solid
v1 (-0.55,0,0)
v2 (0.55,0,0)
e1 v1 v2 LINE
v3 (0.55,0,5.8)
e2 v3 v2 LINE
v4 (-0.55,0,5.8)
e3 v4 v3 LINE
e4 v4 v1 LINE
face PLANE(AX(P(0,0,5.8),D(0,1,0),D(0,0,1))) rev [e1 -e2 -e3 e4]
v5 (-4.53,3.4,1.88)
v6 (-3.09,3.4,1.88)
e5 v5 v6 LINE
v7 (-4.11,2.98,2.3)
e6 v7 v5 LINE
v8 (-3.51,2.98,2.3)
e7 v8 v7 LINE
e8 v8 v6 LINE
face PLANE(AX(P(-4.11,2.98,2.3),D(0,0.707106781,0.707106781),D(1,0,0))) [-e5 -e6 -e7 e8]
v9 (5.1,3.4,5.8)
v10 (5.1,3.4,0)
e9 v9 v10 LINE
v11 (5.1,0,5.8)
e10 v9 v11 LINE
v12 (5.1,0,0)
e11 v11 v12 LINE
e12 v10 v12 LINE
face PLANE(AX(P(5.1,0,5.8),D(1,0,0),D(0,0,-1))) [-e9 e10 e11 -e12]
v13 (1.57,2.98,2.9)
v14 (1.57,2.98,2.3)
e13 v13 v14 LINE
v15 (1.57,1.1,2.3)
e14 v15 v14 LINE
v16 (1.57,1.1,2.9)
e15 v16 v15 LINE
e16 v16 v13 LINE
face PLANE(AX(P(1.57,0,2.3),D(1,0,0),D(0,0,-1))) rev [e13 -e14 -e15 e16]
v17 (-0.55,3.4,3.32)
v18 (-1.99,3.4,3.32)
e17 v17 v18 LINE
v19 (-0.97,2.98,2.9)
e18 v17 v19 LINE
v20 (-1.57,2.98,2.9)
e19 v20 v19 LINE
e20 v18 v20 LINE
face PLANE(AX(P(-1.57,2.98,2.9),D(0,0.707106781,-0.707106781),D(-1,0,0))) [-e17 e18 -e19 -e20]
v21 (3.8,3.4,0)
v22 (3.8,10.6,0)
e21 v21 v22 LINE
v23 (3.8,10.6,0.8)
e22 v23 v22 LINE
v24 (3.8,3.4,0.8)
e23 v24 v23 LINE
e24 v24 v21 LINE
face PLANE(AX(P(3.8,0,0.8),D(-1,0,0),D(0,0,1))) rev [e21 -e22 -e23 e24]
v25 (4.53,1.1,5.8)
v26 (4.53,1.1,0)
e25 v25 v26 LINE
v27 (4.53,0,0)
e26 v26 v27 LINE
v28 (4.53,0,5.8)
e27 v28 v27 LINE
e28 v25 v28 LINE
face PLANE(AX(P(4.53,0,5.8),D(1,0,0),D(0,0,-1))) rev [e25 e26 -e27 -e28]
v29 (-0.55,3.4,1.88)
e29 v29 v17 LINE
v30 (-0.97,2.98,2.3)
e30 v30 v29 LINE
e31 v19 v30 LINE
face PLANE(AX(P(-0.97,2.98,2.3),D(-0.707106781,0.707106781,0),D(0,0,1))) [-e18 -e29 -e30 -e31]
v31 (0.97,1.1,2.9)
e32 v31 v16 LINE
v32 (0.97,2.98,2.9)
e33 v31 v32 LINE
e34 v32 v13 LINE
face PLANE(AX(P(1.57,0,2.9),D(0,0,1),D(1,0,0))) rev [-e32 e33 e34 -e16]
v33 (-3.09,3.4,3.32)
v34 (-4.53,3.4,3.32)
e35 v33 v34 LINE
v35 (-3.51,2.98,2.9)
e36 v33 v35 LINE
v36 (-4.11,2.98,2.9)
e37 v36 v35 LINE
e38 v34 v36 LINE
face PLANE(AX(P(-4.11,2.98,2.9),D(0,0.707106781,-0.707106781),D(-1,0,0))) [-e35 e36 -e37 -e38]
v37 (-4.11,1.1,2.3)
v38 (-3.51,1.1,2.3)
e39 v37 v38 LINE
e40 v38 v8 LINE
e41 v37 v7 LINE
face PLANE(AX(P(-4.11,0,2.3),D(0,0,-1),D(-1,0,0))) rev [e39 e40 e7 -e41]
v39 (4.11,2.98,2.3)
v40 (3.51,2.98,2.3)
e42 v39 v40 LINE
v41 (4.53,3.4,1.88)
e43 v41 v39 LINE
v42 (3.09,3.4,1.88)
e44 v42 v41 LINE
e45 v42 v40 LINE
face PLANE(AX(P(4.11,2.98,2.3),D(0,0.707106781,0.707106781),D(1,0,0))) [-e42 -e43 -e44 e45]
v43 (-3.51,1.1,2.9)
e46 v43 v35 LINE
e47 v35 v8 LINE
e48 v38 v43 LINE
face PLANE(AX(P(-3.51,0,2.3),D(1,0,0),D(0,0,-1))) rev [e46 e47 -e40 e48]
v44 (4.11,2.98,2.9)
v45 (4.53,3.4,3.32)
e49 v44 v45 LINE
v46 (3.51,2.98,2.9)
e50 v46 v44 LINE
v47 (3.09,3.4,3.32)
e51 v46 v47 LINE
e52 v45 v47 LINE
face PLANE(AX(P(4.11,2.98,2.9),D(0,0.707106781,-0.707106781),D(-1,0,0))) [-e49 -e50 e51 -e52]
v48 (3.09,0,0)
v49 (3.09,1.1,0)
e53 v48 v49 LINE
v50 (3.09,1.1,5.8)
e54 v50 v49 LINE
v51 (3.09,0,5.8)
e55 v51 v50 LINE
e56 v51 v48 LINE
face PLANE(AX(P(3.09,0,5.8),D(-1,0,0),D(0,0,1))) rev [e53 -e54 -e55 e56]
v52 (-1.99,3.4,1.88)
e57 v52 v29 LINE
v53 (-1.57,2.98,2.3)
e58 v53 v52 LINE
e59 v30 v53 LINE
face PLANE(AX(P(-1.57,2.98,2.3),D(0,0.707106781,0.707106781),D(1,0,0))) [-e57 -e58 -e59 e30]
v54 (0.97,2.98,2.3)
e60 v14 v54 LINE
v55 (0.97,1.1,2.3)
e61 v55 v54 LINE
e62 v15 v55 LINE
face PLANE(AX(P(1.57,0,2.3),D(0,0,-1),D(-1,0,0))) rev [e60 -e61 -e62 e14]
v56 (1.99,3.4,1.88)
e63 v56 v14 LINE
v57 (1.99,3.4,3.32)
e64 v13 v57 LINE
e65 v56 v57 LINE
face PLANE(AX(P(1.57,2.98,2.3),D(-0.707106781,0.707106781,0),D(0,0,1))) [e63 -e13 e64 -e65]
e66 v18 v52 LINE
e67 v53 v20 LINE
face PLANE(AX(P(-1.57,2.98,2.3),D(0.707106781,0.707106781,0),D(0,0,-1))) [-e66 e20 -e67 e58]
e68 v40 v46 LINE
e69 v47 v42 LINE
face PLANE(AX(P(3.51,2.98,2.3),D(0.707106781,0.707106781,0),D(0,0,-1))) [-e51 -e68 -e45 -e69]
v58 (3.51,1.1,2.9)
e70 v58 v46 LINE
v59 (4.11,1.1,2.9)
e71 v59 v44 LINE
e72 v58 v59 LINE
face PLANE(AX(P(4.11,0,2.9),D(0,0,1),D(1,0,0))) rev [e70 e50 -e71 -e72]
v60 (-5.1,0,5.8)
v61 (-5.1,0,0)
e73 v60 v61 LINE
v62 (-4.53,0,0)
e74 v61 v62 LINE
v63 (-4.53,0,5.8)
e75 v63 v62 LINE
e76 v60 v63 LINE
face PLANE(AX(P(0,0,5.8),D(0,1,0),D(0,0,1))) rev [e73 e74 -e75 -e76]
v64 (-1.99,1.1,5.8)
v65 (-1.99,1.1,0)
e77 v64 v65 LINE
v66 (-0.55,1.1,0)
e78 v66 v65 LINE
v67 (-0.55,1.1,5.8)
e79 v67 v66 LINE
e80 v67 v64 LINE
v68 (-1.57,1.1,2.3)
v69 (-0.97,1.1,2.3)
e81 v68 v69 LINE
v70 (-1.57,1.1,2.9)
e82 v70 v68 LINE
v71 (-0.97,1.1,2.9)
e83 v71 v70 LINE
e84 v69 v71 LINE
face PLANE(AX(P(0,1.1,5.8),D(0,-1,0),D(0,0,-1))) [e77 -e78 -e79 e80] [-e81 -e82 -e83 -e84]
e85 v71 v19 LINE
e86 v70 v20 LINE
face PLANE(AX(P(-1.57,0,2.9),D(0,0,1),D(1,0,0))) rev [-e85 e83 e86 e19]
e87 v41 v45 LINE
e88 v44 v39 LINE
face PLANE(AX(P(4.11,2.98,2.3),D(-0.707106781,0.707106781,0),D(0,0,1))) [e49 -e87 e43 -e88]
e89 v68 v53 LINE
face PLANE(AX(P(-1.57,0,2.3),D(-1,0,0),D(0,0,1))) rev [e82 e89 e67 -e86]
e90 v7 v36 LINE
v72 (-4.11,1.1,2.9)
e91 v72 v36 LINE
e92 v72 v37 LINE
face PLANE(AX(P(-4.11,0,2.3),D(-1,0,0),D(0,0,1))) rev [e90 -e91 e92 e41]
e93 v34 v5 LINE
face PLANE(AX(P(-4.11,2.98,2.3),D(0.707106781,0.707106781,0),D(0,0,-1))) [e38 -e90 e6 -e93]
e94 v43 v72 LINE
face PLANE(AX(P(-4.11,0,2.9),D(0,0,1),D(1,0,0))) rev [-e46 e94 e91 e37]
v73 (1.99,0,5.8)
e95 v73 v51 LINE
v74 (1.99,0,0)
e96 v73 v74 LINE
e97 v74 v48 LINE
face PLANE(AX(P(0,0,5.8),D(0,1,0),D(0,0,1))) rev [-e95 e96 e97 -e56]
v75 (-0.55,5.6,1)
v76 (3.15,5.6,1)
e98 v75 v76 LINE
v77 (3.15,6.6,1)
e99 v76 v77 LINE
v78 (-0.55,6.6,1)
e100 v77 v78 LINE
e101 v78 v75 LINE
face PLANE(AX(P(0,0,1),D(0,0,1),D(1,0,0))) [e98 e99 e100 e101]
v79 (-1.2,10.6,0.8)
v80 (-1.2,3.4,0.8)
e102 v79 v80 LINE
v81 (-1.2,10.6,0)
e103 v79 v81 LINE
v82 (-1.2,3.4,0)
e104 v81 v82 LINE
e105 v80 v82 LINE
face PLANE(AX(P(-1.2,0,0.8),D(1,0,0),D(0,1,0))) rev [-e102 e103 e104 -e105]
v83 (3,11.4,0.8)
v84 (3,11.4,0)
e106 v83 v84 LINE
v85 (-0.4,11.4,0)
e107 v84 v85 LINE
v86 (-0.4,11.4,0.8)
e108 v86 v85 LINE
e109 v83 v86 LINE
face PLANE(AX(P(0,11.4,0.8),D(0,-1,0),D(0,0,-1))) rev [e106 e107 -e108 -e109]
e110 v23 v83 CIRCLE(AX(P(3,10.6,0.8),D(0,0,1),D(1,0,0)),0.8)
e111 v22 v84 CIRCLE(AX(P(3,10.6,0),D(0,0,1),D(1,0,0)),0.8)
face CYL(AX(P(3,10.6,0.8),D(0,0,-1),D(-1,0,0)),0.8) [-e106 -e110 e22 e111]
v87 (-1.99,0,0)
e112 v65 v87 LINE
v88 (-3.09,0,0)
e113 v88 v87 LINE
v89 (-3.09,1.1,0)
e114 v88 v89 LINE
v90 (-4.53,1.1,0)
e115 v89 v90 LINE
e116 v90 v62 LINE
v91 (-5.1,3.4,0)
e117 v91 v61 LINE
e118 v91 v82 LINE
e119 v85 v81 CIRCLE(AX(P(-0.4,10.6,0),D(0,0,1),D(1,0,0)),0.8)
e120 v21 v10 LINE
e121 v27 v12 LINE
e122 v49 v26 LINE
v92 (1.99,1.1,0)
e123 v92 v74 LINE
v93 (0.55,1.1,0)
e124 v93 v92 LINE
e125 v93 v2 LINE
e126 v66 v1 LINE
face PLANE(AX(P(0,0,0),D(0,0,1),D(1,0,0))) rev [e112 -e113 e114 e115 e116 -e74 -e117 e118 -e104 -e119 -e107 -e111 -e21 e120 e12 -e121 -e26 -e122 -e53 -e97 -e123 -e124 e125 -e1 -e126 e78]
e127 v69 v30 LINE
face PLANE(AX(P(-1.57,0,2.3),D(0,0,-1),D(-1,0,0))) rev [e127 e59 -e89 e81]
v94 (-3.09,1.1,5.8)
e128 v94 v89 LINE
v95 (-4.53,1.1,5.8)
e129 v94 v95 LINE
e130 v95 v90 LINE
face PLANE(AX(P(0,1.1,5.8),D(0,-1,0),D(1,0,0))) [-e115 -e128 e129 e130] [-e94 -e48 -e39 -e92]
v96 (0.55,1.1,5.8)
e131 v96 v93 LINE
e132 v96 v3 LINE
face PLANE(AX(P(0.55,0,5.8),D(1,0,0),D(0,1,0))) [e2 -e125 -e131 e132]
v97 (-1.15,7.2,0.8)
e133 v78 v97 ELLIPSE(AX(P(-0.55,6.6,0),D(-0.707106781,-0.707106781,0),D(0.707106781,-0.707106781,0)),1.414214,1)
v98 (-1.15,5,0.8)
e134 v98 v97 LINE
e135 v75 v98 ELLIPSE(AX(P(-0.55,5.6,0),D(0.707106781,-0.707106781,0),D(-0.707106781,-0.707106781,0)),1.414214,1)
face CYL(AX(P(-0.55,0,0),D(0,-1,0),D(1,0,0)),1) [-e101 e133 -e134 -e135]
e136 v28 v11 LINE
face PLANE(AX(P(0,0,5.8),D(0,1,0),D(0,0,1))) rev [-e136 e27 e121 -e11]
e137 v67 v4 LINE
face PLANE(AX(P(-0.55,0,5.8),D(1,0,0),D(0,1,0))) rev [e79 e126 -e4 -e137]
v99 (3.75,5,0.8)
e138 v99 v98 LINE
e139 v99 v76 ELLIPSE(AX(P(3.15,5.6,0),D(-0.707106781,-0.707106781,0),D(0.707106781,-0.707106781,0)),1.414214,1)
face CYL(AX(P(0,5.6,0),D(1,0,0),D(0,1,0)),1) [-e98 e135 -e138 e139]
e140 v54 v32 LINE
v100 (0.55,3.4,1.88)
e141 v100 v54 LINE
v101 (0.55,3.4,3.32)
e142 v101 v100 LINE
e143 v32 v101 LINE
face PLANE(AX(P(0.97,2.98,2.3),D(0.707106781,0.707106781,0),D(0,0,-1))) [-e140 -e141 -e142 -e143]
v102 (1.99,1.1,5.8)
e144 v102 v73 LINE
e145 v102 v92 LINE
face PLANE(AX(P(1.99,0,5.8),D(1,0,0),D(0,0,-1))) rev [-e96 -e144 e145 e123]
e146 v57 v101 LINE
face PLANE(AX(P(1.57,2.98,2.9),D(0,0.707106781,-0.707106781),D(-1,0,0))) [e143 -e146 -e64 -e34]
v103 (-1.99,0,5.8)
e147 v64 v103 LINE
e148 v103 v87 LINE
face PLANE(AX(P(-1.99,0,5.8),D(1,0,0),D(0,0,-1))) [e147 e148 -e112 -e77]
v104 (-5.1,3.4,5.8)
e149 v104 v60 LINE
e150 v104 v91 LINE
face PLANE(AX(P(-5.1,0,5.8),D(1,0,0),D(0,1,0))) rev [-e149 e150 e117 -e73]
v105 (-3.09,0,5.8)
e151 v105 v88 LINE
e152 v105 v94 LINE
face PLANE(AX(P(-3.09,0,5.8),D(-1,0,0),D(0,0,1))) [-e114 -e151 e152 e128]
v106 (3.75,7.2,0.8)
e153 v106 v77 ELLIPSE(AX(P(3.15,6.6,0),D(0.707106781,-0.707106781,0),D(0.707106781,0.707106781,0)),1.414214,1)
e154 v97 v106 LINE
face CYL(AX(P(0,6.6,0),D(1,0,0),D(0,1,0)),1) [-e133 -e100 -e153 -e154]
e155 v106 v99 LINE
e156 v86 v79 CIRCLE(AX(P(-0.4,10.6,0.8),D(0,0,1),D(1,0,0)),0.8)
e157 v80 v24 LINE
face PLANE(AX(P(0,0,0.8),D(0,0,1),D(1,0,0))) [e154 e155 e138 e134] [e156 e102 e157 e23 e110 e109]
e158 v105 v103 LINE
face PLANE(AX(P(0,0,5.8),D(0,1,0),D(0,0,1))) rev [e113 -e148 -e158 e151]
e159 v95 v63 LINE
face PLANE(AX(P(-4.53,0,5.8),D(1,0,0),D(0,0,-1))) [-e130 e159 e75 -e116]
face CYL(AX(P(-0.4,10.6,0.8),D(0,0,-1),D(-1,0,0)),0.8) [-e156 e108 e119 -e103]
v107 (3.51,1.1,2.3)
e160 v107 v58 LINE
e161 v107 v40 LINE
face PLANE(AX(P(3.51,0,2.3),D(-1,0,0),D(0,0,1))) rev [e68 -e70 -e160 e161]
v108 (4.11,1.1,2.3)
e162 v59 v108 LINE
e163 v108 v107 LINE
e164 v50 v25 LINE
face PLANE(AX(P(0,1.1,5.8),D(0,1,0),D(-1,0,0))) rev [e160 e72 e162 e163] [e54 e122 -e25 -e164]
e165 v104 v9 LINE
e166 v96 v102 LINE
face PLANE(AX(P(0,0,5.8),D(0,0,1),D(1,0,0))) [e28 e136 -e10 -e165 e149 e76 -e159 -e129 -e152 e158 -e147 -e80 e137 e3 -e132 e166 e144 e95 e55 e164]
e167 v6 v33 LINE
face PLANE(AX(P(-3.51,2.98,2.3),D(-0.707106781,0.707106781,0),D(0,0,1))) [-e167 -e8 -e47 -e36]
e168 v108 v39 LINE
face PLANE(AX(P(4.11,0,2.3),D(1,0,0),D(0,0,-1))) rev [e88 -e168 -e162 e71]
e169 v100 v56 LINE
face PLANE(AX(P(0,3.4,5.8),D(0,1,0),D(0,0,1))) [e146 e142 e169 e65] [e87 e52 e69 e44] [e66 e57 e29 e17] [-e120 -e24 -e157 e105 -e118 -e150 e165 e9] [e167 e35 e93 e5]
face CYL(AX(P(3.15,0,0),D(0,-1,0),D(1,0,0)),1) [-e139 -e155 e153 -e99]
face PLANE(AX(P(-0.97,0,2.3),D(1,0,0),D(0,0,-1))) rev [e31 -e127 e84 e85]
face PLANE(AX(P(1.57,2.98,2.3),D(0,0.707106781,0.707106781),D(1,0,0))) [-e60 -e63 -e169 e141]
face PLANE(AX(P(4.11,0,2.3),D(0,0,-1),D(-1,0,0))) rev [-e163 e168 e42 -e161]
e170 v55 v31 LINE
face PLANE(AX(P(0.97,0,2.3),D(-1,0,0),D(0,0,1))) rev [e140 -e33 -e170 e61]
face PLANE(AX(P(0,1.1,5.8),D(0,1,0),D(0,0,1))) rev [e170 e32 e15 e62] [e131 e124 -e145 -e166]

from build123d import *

# Parameters (mm, degrees)
AUFSATZ_LINEAR_AUSTRAGEN1_DEPTH = 5.8
SKIZZE1_3_W                     = 4.5
SKIZZE1_3_H                     = 1.8
AUFSATZ_LINEAR_AUSTRAGEN2_DEPTH = 0.8
SKIZZE1_4_W                     = 4.5
SKIZZE1_4_H                     = 1.8
AUFSATZ_LINEAR_AUSTRAGEN3_DEPTH = 1
FASE1_SIZE                      = 0.2
VERRUNDUNG1_START               = -2
VERRUNDUNG1_DEPTH               = 7
VERRUNDUNG1_START_2             = 4
VERRUNDUNG1_2_DEPTH             = 4
SKIZZE3_W                       = 0.6
SKIZZE3_H                       = 0.6
SCHNITT_LINEAR_AUSTRAGEN1_DEPTH = 12.119802157
FASE2_SIZE                      = 0.42


with BuildPart() as part:
    # Skizze1 → Aufsatz-Linear austragen1 (new body)
    with BuildSketch(Plane.XY):
        Polygon((-1.99, 1.1), (-0.55, 1.1), (-0.55, 0), (0.55, 0), (0.55, 1.1), (1.99, 1.1), (1.99, 0), (3.09, 0), (3.09, 1.1), (4.53, 1.1), (4.53, 0), (5.1, 0), (5.1, 3.4), (3.8, 3.4), (-1.2, 3.4), (-5.1, 3.4), (-5.1, 0), (-4.53, 0), (-4.53, 1.1), (-3.09, 1.1), (-3.09, 0), (-1.99, 0), align=None)
    extrude(amount=AUFSATZ_LINEAR_AUSTRAGEN1_DEPTH)

    # Skizze1<3> → Aufsatz-Linear austragen2 (add)
    # profile 1 of 2: a face of its own
    with BuildSketch(Plane.XY):
        with BuildLine():
            Line((-1.2, 10.6), (-1.2, 3.4))
            Line((-1.2, 3.4), (3.8, 3.4))
            Line((3.8, 3.4), (3.8, 10.6))
            ThreePointArc((3.8, 10.6), (3.565685425, 11.165685425), (3, 11.4))
            Line((3, 11.4), (-0.4, 11.4))
            ThreePointArc((-0.4, 11.4), (-0.965685425, 11.165685425), (-1.2, 10.6))
        make_face()
        with Locations((1.3, 6.1)):
            Rectangle(SKIZZE1_3_W, SKIZZE1_3_H, mode=Mode.SUBTRACT)
    # profile 2 of 2: a face of its own
    with BuildSketch(Plane.XY):
        with Locations((1.3, 6.1)):
            Rectangle(SKIZZE1_3_W, SKIZZE1_3_H)
    extrude(amount=AUFSATZ_LINEAR_AUSTRAGEN2_DEPTH)

    # Skizze1<4> → Aufsatz-Linear austragen3 (add)
    with BuildSketch(Plane.XY):
        with Locations((1.3, 6.1)):
            Rectangle(SKIZZE1_4_W, SKIZZE1_4_H)
    extrude(amount=AUFSATZ_LINEAR_AUSTRAGEN3_DEPTH)

    # Fase1
    fase1_edges = [part.edges().sort_by_distance(p)[0] for p in [
        (-0.95, 6.1, 0.8),
        (1.3, 5.2, 0.8),
        (3.55, 6.1, 0.8),
        (1.3, 7, 0.8),
    ]]
    chamfer(fase1_edges, length=FASE1_SIZE - 0.0001)  # a hair under: the kernel refuses the full size

    # Verrundung1: read off the stored shape, not the designer's step
    # Verrundung1 outline → Verrundung1 (cut)
    with BuildSketch(Plane.YZ.offset(VERRUNDUNG1_START)):
        with BuildLine():
            ThreePointArc((5, 0.8), (5.283772234, 0.948683298), (5.6, 1))
            Line((5.6, 1), (5.2, 1))
            Line((5.2, 1), (5, 0.8))
        make_face()
        with BuildLine():
            ThreePointArc((6.6, 1), (6.916227766, 0.948683298), (7.2, 0.8))
            Line((7.2, 0.8), (7, 1))
            Line((7, 1), (6.6, 1))
        make_face()
    extrude(amount=VERRUNDUNG1_DEPTH, mode=Mode.SUBTRACT)

    # Verrundung1 2 outline → Verrundung1 2 (cut)
    with BuildSketch(Plane(origin=(0, 0, 0), x_dir=(1, 0, 0), z_dir=(0, 1, 0)).offset(VERRUNDUNG1_START_2)):
        with BuildLine():
            Line((-0.95, -1), (-0.55, -1))
            ThreePointArc((-0.55, -1), (-0.866227766, -0.948683298), (-1.15, -0.8))
            Line((-1.15, -0.8), (-0.95, -1))
        make_face()
        with BuildLine():
            ThreePointArc((3.75, -0.8), (3.466227766, -0.948683298), (3.15, -1))
            Line((3.15, -1), (3.55, -1))
            Line((3.55, -1), (3.75, -0.8))
        make_face()
    extrude(amount=VERRUNDUNG1_2_DEPTH, mode=Mode.SUBTRACT)

    # Skizze3 → Schnitt-Linear austragen1 (cut, through all)
    with BuildSketch(Plane(origin=(0, 3.4, 0), x_dir=(1, 0, 0), z_dir=(0, 1, 0))):
        with Locations((1.27, -2.6)):
            Rectangle(SKIZZE3_W, SKIZZE3_H)
        with Locations((-1.27, -2.6)):
            Rectangle(SKIZZE3_W, SKIZZE3_H)
        with Locations((-3.81, -2.6)):
            Rectangle(SKIZZE3_W, SKIZZE3_H)
        with Locations((3.81, -2.6)):
            Rectangle(SKIZZE3_W, SKIZZE3_H)
    extrude(amount=-SCHNITT_LINEAR_AUSTRAGEN1_DEPTH, mode=Mode.SUBTRACT)

    # Fase2
    fase2_edges = [part.edges().sort_by_distance(p)[0] for p in [
        (3.81, 3.4, 2.3),
        (3.51, 3.4, 2.6),
        (3.81, 3.4, 2.9),
        (4.11, 3.4, 2.6),
        (1.27, 3.4, 2.3),
        (0.97, 3.4, 2.6),
        (1.27, 3.4, 2.9),
        (1.57, 3.4, 2.6),
        (-3.51, 3.4, 2.6),
        (-3.81, 3.4, 2.3),
        (-4.11, 3.4, 2.6),
        (-3.81, 3.4, 2.9),
        (-0.97, 3.4, 2.6),
        (-1.27, 3.4, 2.3),
        (-1.57, 3.4, 2.6),
        (-1.27, 3.4, 2.9),
    ]]
    chamfer(fase2_edges, length=FASE2_SIZE)


solid = part.part
